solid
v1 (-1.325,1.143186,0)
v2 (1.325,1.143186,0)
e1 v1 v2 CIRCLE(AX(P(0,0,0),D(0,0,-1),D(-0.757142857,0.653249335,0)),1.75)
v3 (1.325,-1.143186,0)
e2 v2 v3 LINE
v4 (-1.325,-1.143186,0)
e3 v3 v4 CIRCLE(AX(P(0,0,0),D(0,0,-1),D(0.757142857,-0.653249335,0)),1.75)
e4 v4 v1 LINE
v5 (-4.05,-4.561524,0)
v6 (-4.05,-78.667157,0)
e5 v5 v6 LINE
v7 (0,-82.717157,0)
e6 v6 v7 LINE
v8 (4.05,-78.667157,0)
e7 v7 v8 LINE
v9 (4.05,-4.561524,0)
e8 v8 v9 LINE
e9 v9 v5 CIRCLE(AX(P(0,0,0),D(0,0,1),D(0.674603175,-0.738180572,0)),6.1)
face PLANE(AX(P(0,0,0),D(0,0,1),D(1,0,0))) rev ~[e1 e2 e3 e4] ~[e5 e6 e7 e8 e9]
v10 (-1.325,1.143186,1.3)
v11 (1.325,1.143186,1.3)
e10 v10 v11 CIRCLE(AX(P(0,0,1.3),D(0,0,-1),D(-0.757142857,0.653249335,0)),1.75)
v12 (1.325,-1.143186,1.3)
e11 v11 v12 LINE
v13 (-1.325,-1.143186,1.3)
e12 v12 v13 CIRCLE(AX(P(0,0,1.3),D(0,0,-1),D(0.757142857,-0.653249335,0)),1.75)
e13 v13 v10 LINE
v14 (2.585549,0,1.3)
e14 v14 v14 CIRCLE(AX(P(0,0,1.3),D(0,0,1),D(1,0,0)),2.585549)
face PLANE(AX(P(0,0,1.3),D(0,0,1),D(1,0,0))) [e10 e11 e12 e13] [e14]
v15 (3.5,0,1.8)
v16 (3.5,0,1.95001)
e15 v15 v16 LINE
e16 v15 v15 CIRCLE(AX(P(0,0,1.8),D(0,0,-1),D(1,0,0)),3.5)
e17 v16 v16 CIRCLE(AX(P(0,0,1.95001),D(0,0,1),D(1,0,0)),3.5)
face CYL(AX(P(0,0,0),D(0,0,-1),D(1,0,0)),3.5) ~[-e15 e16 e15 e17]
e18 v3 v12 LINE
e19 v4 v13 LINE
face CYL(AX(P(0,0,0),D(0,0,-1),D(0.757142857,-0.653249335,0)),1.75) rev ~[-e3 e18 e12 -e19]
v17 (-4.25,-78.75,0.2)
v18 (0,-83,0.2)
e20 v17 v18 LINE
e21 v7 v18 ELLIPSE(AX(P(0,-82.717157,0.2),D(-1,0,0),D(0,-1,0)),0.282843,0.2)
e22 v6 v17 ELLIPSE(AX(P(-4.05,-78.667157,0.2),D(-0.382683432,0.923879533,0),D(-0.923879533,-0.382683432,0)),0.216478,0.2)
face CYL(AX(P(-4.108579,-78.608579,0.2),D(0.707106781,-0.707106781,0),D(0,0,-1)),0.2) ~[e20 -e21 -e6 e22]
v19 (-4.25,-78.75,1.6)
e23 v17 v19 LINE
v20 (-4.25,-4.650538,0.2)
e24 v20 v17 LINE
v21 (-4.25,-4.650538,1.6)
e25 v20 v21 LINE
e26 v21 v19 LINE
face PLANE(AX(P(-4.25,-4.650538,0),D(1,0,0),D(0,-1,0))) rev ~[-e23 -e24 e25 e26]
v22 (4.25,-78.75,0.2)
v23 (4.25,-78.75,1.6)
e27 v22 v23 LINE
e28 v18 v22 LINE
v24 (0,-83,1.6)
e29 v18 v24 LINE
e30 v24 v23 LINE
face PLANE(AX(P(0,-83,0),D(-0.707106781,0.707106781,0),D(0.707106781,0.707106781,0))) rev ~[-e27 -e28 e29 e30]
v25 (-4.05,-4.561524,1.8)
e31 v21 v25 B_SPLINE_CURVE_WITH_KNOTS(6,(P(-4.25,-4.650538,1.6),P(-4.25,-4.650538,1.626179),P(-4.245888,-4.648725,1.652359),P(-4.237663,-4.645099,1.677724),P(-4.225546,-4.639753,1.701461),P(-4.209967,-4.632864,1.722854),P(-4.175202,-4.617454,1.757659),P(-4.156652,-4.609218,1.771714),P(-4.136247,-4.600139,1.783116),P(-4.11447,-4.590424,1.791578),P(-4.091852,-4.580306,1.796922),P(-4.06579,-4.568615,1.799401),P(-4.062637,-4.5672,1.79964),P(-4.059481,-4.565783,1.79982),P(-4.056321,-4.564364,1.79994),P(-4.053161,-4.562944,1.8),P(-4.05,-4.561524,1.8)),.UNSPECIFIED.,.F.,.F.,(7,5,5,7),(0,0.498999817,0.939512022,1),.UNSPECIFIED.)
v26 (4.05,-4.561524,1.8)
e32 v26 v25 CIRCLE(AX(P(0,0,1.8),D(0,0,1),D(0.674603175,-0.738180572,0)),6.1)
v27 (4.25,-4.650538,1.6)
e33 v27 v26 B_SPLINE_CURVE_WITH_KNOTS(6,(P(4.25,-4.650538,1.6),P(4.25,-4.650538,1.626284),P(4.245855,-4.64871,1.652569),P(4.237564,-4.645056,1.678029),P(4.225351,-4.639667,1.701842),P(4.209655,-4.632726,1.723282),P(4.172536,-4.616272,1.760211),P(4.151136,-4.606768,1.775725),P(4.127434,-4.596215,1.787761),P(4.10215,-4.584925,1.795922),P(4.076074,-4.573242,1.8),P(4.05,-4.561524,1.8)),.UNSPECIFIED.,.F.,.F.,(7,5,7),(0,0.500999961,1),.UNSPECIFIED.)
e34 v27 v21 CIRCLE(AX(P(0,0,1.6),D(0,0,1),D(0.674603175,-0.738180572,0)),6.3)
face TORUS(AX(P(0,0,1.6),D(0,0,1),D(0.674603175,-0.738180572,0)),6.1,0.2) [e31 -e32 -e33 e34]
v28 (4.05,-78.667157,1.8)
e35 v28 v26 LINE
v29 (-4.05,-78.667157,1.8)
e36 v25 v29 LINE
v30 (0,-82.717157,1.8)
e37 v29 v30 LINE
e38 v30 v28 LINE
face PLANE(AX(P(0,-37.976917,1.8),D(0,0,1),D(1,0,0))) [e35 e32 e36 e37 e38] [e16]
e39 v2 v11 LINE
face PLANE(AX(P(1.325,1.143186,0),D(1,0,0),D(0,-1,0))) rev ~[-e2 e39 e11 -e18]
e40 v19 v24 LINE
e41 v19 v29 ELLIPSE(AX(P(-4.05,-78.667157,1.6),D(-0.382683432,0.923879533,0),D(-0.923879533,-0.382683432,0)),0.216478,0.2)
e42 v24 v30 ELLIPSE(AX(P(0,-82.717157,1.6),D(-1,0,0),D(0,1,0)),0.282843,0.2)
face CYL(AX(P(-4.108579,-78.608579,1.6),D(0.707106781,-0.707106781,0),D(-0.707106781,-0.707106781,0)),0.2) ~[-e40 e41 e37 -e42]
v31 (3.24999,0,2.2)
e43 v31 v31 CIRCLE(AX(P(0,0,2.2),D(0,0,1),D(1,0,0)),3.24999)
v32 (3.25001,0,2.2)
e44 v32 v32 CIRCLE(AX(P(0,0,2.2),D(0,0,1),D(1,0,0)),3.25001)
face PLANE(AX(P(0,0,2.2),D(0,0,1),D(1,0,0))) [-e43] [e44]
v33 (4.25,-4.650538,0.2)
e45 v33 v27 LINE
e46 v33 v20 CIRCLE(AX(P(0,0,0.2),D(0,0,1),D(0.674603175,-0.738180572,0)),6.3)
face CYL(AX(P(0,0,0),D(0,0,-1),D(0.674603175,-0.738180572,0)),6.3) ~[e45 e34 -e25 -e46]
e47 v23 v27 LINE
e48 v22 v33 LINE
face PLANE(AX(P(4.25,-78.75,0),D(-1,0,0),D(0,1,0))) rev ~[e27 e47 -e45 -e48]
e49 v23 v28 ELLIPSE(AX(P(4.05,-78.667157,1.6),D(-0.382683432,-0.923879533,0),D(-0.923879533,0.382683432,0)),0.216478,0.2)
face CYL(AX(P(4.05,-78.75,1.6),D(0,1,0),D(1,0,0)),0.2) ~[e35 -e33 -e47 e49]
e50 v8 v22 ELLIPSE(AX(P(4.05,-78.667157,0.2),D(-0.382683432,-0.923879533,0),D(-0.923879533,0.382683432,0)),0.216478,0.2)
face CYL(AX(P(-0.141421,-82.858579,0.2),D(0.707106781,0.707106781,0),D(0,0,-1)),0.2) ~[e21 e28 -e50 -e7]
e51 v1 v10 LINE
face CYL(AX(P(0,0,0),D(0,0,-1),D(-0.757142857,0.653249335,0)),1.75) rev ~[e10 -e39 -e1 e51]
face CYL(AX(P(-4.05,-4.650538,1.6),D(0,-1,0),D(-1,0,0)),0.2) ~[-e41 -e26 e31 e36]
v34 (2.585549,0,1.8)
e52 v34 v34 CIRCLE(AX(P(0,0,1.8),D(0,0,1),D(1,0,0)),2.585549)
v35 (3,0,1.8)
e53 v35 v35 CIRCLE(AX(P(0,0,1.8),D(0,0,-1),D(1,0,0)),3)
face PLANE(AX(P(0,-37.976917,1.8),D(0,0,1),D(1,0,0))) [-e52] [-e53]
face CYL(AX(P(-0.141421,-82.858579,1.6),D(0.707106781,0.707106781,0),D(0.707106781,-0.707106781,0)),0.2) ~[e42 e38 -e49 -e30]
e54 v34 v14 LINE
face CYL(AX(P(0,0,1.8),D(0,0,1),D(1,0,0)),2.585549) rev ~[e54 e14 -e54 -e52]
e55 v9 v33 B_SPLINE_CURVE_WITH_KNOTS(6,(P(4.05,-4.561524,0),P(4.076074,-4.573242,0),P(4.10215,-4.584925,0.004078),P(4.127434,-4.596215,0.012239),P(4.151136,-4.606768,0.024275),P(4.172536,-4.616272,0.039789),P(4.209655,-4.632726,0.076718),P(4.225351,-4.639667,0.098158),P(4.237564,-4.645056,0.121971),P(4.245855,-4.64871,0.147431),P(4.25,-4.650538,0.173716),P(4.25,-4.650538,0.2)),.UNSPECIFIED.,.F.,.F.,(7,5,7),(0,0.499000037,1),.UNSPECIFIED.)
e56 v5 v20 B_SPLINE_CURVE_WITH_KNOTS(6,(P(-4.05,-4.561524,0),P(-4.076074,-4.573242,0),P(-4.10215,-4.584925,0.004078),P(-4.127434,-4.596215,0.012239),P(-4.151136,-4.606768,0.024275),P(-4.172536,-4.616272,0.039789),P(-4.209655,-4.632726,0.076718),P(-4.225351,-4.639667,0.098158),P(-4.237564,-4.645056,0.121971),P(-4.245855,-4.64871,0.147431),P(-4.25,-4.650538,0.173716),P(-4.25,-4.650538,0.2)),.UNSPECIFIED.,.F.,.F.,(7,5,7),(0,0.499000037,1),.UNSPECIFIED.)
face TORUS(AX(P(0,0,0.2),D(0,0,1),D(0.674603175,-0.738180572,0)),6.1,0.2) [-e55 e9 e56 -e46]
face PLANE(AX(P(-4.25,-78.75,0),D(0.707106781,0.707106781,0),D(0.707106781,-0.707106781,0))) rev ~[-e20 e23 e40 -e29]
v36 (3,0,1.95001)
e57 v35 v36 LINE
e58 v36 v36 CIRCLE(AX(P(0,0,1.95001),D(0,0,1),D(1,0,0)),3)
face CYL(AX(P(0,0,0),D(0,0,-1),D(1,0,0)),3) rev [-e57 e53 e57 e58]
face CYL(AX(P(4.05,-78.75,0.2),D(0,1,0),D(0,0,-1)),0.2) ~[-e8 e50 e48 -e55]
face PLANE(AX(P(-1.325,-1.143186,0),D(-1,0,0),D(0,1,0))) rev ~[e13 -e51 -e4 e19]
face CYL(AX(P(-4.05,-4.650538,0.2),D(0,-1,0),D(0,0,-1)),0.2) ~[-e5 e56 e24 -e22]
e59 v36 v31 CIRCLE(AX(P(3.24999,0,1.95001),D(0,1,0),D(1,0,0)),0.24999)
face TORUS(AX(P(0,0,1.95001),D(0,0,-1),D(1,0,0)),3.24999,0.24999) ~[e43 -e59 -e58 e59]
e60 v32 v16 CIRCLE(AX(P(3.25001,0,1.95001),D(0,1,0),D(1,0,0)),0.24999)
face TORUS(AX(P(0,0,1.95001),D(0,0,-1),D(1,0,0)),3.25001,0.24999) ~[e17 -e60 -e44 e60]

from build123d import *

# Parameters (mm, degrees)
F0_R     = 3.5
F0_R_2   = 3
F1_DEPTH = 1.8
F2_DEPTH = 2.2
F3_R     = 0.2
F4_R     = 0.24999
F5_R     = 2.5855494015
F6_DEPTH = 0.5


# Not quite as in the source:
# - a fillet or chamfer is up to 0.001 mm smaller than in the source, because OpenCascade refuses the exact size


with BuildPart() as f1:
    # F0 (on Top) → F1 (new body)
    with BuildSketch(Plane.XY):
        with BuildLine():
            Line((4.25, -78.75), (4.25, -4.6505376033))
            ThreePointArc((4.25, -4.6505376033), (0, 6.3), (-4.25, -4.6505376033))
            Line((-4.25, -4.6505376033), (-4.25, -78.75))
            Line((-4.25, -78.75), (0, -83))
            Line((0, -83), (4.25, -78.75))
        make_face()
        Circle(F0_R, mode=Mode.SUBTRACT)
        Circle(F0_R)
        Circle(F0_R_2, mode=Mode.SUBTRACT)
        Circle(F0_R_2)
        with BuildLine():
            ThreePointArc((1.325, -1.1431863365), (0, -1.75), (-1.325, -1.1431863365))
            Line((-1.325, -1.1431863365), (-1.325, 1.1431863365))
            ThreePointArc((-1.325, 1.1431863365), (0, 1.75), (1.325, 1.1431863365))
            Line((1.325, 1.1431863365), (1.325, -1.1431863365))
        make_face(mode=Mode.SUBTRACT)
    extrude(amount=F1_DEPTH)

    # F0 (on Top) → F2 (join)
    with BuildSketch(Plane.XY):
        Circle(F0_R)
        Circle(F0_R_2, mode=Mode.SUBTRACT)
    extrude(amount=F2_DEPTH)

    # F3
    f3_edges = [f1.edges().sort_by_distance(p)[0] for p in [
        (-4.25, -41.700269, 1.8),
        (0, 6.3, 1.8),
        (4.25, -41.700269, 1.8),
        (2.125, -80.875, 1.8),
        (-2.125, -80.875, 1.8),
        (0, 6.3, 0),
        (4.25, -41.700269, 0),
        (-4.25, -41.700269, 0),
        (-2.125, -80.875, 0),
        (2.125, -80.875, 0),
    ]]
    fillet(f3_edges, radius=F3_R)

    # F4 (radius 0.25 in the source; OpenCascade refuses exactly that, so slightly less here)
    f4_edges = [f1.edges().sort_by_distance(p)[0] for p in [
        (-3.5, 0, 2.2),
        (-3, 0, 2.2),
    ]]
    fillet(f4_edges, radius=F4_R)

    # F5 (on face) → F6 (cut)
    with BuildSketch(Plane.XY.offset(1.8)):
        Circle(F5_R)
    extrude(amount=-F6_DEPTH, mode=Mode.SUBTRACT)


solid = f1.part
